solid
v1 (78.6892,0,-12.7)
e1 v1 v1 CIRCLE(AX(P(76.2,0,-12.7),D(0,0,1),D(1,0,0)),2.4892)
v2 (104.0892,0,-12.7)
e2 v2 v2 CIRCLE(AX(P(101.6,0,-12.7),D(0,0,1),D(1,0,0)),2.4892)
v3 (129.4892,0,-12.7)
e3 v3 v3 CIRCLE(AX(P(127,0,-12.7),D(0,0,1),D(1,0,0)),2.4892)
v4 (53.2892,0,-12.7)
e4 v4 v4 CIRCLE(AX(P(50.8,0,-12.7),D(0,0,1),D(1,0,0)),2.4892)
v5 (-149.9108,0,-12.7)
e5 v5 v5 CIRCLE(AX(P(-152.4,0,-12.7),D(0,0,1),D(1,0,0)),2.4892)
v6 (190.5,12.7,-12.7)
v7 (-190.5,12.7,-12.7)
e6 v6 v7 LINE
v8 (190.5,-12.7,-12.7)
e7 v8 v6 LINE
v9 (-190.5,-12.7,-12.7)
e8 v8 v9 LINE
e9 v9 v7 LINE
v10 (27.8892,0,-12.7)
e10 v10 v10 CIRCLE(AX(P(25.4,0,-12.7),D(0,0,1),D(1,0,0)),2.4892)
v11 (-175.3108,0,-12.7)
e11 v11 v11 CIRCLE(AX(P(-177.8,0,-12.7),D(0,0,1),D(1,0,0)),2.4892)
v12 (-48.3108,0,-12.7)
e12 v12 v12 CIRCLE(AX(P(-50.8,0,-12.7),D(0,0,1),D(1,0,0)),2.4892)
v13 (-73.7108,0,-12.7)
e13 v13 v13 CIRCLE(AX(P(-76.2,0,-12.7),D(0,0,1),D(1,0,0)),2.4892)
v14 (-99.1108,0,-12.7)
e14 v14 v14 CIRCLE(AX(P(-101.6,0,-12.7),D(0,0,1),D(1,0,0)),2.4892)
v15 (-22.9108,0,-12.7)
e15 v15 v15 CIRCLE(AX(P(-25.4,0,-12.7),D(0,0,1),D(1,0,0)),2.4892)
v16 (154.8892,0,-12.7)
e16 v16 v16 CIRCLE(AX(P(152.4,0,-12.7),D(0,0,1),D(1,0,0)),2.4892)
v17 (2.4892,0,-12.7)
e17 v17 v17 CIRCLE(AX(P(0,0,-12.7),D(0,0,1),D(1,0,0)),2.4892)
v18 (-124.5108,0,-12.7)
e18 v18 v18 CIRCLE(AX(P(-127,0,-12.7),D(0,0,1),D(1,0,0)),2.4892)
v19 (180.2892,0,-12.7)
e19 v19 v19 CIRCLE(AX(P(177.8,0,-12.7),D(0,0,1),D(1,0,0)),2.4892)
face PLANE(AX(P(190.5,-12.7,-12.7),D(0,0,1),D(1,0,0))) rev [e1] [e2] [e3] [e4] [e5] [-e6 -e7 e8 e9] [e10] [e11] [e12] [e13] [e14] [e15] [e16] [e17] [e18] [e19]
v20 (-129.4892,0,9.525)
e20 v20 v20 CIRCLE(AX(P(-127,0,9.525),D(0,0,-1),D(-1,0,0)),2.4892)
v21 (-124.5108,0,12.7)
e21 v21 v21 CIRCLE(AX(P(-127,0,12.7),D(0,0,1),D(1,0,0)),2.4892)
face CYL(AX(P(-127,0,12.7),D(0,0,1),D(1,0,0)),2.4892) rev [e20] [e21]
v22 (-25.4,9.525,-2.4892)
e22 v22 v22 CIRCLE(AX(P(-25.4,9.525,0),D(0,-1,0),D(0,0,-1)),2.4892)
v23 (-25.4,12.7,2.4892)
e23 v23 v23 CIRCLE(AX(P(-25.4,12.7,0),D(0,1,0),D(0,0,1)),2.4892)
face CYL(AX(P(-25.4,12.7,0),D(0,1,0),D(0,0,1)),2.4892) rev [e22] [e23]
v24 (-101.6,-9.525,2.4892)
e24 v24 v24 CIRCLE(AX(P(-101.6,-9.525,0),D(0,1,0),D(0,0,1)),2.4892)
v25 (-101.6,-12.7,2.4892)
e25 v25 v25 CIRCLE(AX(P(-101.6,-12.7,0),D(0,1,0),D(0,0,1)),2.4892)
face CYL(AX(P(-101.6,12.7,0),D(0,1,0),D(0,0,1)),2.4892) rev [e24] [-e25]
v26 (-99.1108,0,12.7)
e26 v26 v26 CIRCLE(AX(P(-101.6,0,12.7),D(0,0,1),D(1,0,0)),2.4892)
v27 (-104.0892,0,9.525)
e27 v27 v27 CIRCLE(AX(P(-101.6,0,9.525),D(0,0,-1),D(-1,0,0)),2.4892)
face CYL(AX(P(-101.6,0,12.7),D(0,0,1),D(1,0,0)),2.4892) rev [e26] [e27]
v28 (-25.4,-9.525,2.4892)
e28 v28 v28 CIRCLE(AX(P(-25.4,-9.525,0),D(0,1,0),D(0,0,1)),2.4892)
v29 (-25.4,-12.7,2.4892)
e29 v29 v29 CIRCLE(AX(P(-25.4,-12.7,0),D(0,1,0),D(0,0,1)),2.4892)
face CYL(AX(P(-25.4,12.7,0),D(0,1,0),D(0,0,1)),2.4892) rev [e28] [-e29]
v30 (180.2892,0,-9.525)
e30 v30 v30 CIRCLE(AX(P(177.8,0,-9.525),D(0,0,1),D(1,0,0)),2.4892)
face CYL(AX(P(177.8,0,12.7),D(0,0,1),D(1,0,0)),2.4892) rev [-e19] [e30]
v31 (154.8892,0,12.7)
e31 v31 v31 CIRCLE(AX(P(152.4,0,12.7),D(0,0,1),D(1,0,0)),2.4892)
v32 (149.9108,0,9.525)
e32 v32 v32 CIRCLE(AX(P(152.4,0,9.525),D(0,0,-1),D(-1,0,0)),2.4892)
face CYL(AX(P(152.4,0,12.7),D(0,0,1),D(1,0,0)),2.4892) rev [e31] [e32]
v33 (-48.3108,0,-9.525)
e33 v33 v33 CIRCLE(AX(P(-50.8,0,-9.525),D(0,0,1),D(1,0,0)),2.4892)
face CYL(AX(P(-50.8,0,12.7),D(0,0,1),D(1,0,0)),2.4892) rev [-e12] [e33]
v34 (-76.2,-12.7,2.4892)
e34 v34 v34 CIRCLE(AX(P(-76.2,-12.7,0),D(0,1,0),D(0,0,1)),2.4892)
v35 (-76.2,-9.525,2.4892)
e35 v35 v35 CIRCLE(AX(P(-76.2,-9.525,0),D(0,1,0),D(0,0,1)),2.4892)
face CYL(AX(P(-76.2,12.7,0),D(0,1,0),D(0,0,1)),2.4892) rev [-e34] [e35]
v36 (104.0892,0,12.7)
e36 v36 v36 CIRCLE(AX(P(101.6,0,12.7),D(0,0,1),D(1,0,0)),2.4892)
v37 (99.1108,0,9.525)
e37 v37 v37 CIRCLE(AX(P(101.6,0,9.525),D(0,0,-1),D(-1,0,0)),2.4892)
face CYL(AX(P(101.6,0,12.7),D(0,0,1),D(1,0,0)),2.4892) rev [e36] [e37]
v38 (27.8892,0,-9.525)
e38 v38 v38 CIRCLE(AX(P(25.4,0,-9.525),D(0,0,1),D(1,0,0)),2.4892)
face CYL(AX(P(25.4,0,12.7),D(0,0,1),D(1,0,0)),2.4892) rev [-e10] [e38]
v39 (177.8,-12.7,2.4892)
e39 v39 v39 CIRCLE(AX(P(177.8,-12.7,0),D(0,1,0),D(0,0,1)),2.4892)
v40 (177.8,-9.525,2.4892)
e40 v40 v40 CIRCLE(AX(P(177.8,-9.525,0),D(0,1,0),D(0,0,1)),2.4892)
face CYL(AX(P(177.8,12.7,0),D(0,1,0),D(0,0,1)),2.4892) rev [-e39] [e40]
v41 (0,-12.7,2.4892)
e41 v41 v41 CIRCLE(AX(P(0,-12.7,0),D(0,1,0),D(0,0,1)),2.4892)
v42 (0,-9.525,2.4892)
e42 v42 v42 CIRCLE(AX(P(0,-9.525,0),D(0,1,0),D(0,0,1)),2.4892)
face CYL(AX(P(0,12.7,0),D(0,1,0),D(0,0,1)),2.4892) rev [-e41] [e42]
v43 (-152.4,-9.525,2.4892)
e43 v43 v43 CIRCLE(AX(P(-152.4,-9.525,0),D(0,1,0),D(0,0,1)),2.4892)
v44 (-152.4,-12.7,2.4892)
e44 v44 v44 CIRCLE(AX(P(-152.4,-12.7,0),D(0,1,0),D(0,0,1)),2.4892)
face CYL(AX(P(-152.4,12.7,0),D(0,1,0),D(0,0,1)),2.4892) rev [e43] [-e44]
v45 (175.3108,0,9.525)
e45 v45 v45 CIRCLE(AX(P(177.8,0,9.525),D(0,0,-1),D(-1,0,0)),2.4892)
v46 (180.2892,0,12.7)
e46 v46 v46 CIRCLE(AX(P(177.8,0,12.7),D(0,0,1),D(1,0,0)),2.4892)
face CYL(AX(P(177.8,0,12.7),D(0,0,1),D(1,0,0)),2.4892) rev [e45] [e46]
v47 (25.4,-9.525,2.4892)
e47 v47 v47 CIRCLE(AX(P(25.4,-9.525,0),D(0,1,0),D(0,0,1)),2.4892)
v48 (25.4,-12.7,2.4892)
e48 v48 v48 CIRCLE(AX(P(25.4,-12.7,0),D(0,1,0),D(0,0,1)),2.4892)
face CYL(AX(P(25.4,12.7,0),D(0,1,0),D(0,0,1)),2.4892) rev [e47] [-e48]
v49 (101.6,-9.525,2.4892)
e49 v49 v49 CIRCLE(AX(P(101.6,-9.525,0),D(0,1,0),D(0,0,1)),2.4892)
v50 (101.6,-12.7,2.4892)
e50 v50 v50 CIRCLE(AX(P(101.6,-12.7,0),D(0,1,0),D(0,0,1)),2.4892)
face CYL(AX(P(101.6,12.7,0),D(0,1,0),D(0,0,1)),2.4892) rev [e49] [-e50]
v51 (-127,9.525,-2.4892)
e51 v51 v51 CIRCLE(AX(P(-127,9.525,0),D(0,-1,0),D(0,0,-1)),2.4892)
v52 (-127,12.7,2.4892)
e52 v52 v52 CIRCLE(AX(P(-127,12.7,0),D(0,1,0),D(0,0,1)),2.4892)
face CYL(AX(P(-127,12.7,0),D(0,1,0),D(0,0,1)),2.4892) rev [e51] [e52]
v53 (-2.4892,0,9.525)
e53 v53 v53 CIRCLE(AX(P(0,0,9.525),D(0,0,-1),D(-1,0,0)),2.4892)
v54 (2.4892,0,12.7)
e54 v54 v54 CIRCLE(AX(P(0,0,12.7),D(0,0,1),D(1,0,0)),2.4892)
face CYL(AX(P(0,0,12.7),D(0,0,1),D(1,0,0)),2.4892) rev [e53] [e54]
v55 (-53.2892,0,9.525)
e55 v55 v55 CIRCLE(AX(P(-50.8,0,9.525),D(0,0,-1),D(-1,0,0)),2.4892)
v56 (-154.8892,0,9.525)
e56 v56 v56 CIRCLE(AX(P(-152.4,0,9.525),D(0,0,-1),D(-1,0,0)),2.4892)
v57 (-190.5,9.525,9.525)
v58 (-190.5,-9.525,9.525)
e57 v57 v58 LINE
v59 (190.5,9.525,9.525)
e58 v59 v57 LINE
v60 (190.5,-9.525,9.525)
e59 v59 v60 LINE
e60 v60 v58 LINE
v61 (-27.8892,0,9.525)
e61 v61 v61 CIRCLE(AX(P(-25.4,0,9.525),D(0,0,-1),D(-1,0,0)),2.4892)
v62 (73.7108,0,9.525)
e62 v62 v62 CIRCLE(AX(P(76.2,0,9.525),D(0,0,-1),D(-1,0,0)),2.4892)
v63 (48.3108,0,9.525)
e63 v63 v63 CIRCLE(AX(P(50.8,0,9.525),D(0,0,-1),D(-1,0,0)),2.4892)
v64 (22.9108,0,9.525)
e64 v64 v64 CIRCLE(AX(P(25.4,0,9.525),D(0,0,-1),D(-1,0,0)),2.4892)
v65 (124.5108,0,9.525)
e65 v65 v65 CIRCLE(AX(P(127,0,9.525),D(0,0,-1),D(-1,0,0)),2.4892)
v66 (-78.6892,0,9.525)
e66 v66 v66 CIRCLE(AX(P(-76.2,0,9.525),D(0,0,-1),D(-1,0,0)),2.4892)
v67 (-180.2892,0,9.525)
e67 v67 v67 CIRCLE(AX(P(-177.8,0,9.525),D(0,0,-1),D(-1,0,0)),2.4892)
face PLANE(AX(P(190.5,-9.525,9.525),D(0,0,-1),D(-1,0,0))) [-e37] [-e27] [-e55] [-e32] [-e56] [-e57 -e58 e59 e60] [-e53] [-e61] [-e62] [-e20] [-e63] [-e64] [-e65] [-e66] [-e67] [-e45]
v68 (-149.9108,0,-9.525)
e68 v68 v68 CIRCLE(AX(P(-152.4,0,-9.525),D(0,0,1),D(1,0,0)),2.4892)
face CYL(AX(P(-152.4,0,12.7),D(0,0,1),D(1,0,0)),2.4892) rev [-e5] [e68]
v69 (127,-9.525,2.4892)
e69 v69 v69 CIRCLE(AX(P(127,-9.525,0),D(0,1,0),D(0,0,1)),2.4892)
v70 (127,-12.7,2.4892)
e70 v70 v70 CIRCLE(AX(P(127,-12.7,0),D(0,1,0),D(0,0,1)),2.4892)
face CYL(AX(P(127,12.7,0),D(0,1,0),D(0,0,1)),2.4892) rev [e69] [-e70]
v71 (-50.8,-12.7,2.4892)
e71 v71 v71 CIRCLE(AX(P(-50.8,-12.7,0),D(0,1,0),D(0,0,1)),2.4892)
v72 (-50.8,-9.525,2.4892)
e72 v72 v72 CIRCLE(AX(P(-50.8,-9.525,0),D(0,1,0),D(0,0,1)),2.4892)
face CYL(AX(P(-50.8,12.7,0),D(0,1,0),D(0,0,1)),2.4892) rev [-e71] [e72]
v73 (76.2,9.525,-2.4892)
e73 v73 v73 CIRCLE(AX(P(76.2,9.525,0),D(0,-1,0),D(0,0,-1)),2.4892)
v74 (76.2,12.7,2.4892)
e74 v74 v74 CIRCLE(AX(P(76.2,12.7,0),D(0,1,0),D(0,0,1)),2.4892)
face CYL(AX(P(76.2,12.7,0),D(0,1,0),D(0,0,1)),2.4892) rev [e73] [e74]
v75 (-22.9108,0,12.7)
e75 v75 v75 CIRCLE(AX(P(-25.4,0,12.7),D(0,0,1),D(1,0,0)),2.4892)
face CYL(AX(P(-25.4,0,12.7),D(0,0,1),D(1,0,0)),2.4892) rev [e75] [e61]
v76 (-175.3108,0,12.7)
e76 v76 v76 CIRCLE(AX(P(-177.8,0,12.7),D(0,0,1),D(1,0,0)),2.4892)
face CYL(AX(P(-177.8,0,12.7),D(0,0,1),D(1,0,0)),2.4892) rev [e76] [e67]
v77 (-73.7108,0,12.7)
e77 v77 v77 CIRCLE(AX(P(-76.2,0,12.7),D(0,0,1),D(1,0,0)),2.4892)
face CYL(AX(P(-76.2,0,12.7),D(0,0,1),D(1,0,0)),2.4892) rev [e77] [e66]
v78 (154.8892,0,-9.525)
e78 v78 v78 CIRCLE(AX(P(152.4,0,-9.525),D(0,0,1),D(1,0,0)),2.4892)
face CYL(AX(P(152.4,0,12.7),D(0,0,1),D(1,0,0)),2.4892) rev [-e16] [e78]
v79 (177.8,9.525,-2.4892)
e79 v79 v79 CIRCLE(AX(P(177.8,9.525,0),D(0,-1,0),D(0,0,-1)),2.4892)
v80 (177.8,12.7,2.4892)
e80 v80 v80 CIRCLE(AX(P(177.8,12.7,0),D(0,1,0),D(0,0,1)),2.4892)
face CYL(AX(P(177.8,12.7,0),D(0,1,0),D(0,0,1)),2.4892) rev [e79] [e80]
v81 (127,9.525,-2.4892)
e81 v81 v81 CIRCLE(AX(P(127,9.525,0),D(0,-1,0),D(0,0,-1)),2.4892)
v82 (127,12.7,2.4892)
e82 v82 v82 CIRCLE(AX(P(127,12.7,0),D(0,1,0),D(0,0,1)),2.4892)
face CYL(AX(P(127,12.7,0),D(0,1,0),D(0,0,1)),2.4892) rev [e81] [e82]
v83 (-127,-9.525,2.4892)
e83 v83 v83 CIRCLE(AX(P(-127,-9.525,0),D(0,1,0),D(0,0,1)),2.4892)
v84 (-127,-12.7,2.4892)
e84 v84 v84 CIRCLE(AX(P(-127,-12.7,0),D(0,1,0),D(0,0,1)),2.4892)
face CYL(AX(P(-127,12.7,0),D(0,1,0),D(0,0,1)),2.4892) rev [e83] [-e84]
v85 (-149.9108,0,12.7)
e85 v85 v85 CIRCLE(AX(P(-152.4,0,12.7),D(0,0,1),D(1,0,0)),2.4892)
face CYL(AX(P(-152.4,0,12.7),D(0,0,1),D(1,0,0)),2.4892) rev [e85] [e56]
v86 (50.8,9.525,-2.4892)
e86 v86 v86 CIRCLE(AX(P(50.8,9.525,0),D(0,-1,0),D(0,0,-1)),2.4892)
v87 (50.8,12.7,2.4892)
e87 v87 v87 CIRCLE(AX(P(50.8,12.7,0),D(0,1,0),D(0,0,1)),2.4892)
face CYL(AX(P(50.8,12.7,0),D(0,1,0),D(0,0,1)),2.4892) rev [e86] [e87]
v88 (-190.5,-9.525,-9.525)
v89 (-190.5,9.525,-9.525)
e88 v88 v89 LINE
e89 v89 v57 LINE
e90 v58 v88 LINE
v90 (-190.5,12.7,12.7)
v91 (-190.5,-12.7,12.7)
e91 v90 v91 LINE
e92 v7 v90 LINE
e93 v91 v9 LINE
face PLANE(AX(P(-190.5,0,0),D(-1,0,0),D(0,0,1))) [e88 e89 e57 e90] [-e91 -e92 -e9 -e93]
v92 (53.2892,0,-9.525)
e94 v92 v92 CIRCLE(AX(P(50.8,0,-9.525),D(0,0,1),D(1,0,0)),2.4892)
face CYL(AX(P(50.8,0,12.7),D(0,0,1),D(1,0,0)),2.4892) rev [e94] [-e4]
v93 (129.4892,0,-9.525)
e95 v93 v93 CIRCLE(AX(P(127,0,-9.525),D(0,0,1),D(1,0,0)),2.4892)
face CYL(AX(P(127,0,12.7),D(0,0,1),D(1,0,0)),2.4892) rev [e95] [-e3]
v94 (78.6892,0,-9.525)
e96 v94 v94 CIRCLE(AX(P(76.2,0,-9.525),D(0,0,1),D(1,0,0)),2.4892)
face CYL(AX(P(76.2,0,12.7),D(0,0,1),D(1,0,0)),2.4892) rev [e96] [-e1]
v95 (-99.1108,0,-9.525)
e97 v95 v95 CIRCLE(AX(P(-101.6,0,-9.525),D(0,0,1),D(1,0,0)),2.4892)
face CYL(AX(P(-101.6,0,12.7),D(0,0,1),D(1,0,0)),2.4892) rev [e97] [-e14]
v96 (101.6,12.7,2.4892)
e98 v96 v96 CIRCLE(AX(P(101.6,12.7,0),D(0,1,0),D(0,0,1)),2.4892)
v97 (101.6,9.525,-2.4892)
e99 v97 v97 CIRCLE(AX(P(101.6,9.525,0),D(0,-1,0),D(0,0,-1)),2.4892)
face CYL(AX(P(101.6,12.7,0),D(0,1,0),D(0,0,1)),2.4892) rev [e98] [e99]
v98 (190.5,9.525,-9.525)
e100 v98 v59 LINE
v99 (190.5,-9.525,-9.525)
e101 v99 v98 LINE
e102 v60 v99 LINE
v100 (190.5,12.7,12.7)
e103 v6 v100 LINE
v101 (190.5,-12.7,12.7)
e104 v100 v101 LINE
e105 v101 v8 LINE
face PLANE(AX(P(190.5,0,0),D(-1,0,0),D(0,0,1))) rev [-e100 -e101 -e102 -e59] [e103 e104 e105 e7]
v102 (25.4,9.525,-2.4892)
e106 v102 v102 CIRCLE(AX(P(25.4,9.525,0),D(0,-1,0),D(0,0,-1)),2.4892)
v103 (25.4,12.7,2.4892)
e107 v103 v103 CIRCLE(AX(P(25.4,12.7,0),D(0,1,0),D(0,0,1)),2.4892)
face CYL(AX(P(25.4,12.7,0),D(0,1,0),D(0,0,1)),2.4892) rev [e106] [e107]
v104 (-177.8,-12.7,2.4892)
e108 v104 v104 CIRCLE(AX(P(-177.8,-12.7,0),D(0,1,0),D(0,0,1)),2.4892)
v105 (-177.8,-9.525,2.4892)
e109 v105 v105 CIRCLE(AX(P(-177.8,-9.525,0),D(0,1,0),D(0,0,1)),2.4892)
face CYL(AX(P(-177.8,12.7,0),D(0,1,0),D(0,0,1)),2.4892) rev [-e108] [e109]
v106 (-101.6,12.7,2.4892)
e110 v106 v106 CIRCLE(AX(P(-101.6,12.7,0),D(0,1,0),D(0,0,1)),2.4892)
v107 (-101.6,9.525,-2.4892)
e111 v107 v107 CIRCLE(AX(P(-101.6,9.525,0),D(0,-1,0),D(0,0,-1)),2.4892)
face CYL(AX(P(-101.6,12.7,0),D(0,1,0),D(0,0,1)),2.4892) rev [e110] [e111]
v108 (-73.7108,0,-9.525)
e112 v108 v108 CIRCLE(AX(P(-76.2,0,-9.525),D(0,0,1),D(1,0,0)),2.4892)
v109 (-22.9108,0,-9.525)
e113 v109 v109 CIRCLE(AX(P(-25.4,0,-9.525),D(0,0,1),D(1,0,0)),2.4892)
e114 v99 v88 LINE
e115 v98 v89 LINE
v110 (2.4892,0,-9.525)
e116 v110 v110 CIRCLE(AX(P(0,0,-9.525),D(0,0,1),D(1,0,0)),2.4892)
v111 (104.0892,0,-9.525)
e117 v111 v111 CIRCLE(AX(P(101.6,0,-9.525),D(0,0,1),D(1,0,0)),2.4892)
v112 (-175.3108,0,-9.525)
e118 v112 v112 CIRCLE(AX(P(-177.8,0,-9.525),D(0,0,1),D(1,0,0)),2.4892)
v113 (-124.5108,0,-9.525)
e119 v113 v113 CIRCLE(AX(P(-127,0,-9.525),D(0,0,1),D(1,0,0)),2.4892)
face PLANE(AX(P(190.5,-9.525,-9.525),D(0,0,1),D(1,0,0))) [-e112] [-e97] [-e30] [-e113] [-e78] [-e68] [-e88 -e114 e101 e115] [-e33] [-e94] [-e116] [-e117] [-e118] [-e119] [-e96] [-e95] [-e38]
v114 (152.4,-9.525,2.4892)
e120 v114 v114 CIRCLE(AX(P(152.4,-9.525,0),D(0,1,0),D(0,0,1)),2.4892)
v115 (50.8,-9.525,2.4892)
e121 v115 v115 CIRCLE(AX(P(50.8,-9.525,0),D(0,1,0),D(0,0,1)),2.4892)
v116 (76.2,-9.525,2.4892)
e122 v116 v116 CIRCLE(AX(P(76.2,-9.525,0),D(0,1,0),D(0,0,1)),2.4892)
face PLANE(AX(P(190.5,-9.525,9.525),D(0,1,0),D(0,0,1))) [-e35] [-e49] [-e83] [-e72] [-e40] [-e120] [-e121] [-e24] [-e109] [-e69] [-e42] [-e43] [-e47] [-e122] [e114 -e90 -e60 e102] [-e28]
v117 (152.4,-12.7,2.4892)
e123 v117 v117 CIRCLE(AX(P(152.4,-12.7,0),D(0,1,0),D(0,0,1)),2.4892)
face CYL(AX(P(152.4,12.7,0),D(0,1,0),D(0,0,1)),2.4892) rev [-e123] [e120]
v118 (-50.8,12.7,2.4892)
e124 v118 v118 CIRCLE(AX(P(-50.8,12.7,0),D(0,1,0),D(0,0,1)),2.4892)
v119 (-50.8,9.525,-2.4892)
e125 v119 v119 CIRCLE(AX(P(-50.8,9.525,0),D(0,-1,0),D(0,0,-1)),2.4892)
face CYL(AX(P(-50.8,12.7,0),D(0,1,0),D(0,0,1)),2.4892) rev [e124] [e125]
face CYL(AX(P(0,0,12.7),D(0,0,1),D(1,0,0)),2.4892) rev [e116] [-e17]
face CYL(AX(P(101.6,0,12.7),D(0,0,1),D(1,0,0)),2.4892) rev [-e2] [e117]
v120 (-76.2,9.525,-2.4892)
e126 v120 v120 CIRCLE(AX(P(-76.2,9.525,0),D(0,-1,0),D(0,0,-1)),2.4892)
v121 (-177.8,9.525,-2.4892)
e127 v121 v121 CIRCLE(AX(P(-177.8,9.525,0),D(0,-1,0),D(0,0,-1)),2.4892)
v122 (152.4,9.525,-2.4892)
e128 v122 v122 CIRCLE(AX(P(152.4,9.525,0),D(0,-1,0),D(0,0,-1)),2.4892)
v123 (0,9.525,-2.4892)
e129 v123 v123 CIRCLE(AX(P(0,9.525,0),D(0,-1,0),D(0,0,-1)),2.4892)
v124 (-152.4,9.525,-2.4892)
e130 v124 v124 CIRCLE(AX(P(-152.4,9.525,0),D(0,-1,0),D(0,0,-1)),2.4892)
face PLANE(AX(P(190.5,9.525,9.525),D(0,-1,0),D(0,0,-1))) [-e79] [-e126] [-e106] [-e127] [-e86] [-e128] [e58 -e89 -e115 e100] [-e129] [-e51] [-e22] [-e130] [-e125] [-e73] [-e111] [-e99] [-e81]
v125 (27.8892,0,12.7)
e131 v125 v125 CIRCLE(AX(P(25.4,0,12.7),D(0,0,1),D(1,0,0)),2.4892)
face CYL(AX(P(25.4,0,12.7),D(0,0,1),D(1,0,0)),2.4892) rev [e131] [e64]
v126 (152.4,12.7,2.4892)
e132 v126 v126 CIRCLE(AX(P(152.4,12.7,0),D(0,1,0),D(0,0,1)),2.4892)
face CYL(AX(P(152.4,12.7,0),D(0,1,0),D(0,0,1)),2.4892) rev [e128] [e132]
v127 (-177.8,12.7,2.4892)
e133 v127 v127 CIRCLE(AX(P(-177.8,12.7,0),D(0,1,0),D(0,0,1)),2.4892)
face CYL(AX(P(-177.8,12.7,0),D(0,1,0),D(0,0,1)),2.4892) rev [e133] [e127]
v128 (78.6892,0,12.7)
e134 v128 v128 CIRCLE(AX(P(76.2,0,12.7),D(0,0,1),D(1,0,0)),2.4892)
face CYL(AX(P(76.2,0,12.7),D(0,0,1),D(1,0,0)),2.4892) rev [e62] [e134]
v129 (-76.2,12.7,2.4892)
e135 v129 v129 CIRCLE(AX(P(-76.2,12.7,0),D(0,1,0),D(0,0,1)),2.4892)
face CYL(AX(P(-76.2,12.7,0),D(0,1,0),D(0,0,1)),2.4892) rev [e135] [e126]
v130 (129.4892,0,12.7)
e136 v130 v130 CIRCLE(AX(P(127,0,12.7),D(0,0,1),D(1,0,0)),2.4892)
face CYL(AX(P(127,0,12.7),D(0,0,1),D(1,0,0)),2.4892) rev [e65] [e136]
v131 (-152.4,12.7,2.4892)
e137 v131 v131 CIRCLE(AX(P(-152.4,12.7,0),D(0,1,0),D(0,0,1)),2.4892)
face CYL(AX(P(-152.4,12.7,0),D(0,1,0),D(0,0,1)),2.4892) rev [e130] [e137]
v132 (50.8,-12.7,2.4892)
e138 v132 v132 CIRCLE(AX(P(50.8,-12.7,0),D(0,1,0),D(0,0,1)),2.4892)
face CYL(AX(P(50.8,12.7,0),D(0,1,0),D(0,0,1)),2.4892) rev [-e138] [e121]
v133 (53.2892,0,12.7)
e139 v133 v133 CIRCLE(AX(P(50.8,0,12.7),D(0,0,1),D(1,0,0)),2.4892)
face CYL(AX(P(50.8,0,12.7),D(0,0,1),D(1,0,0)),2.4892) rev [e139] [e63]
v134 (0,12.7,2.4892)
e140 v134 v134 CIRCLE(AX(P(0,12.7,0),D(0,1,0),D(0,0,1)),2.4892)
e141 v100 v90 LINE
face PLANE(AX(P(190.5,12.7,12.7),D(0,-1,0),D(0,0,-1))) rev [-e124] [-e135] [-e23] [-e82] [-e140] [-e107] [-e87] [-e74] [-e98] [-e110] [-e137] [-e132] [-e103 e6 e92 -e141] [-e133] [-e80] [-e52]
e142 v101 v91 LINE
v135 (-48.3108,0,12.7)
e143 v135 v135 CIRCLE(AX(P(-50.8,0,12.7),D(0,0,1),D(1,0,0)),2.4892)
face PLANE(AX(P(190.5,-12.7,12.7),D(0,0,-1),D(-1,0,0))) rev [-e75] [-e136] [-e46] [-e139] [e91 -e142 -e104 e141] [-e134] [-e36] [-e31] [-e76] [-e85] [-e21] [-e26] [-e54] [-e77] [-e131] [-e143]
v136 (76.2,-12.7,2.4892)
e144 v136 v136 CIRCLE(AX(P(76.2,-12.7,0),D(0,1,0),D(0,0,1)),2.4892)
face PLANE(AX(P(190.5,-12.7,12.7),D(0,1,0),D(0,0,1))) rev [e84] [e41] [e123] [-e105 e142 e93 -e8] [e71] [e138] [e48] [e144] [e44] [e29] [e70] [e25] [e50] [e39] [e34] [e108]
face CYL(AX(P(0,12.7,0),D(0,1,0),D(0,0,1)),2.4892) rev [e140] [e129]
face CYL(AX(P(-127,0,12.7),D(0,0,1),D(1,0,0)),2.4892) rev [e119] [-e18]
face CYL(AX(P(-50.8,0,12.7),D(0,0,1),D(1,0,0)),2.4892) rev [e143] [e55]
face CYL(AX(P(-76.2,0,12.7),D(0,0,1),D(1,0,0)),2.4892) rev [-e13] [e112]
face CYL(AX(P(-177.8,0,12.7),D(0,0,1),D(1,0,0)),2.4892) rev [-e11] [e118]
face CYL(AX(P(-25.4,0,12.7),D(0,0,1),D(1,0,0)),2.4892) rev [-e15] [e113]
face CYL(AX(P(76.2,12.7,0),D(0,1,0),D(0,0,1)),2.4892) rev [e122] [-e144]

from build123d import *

# Parameters (mm, degrees)
SKETCH1_W             = 25.4
SKETCH1_H             = 25.4
SKETCH1_W_2           = 19.05
SKETCH1_H_2           = 19.05
BOSS_EXTRUDE1_DEPTH   = 190.5
SKETCH3_W             = 2.4892
SKETCH3_H             = 25.4
SKETCH3_AT_POINT_2_W  = 2.4892
SKETCH3_AT_POINT_2_H  = 25.4
LPATTERN1_START       = -12.7
LPATTERN1_OUTLINE_R   = 2.4892
LPATTERN1_DEPTH       = 25.4
LPATTERN1_2_OUTLINE_R = 2.4892
LPATTERN1_2_DEPTH     = 25.4


# Read off the part's stored shape, not the designer's step: LPattern1
with BuildPart() as part:
    # Sketch1 → Boss-Extrude1 (new, symmetric)
    with BuildSketch(Plane(origin=(0, 0, 0), x_dir=(0, 0, -1), z_dir=(1, 0, 0))):
        Rectangle(SKETCH1_W, SKETCH1_H)
        Rectangle(SKETCH1_W_2, SKETCH1_H_2, mode=Mode.SUBTRACT)
    extrude(amount=BOSS_EXTRUDE1_DEPTH, both=True)

    # Sketch3 → #9 (0.196) Diameter Hole1 (revolve, cut)
    with BuildSketch(Plane(origin=(177.8, 12.7, 0), x_dir=(0, 0, 1), z_dir=(1, 0, 0))):
        with Locations((1.2446, 12.7)):
            Rectangle(SKETCH3_W, SKETCH3_H)
    revolve(axis=Axis((177.8, 19.05, 0), (0, -1, 0)), mode=Mode.SUBTRACT)

    # Sketch3 at point 2 (carried to point 2, square into its face) → #9 (0.196) Diameter Hole1 at 2 (revolve, cut)
    with BuildSketch(Plane(origin=(177.8, 0, 12.7), x_dir=(0, -1, 0), z_dir=(1, 0, 0))):
        with Locations((1.2446, 12.7)):
            Rectangle(SKETCH3_AT_POINT_2_W, SKETCH3_AT_POINT_2_H)
    revolve(axis=Axis((177.8, 0, 19.05), (0, 0, -1)), mode=Mode.SUBTRACT)

    # LPattern1 outline → LPattern1 (cut)
    with BuildSketch(Plane.XY.offset(LPATTERN1_START)):
        with Locations((152.4, 0)):
            Circle(LPATTERN1_OUTLINE_R)
        with Locations((127, 0)):
            Circle(LPATTERN1_OUTLINE_R)
        with Locations((101.6, 0)):
            Circle(LPATTERN1_OUTLINE_R)
        with Locations((76.2, 0)):
            Circle(LPATTERN1_OUTLINE_R)
        with Locations((50.8, 0)):
            Circle(LPATTERN1_OUTLINE_R)
        with Locations((25.4, 0)):
            Circle(LPATTERN1_OUTLINE_R)
        Circle(LPATTERN1_OUTLINE_R)
        with Locations((-25.4, 0)):
            Circle(LPATTERN1_OUTLINE_R)
        with Locations((-50.8, 0)):
            Circle(LPATTERN1_OUTLINE_R)
        with Locations((-76.2, 0)):
            Circle(LPATTERN1_OUTLINE_R)
        with Locations((-101.6, 0)):
            Circle(LPATTERN1_OUTLINE_R)
        with Locations((-127, 0)):
            Circle(LPATTERN1_OUTLINE_R)
        with Locations((-152.4, 0)):
            Circle(LPATTERN1_OUTLINE_R)
        with Locations((-177.8, 0)):
            Circle(LPATTERN1_OUTLINE_R)
    extrude(amount=LPATTERN1_DEPTH, mode=Mode.SUBTRACT)

    # LPattern1 2 outline → LPattern1 2 (cut)
    with BuildSketch(Plane(origin=(0, 0, 0), x_dir=(1, 0, 0), z_dir=(0, 1, 0)).offset(LPATTERN1_START)):
        with Locations((152.4, 0)):
            Circle(LPATTERN1_2_OUTLINE_R)
        with Locations((127, 0)):
            Circle(LPATTERN1_2_OUTLINE_R)
        with Locations((101.6, 0)):
            Circle(LPATTERN1_2_OUTLINE_R)
        with Locations((76.2, 0)):
            Circle(LPATTERN1_2_OUTLINE_R)
        with Locations((50.8, 0)):
            Circle(LPATTERN1_2_OUTLINE_R)
        with Locations((25.4, 0)):
            Circle(LPATTERN1_2_OUTLINE_R)
        Circle(LPATTERN1_2_OUTLINE_R)
        with Locations((-25.4, 0)):
            Circle(LPATTERN1_2_OUTLINE_R)
        with Locations((-50.8, 0)):
            Circle(LPATTERN1_2_OUTLINE_R)
        with Locations((-76.2, 0)):
            Circle(LPATTERN1_2_OUTLINE_R)
        with Locations((-101.6, 0)):
            Circle(LPATTERN1_2_OUTLINE_R)
        with Locations((-127, 0)):
            Circle(LPATTERN1_2_OUTLINE_R)
        with Locations((-152.4, 0)):
            Circle(LPATTERN1_2_OUTLINE_R)
        with Locations((-177.8, 0)):
            Circle(LPATTERN1_2_OUTLINE_R)
    extrude(amount=LPATTERN1_2_DEPTH, mode=Mode.SUBTRACT)


solid = part.part
